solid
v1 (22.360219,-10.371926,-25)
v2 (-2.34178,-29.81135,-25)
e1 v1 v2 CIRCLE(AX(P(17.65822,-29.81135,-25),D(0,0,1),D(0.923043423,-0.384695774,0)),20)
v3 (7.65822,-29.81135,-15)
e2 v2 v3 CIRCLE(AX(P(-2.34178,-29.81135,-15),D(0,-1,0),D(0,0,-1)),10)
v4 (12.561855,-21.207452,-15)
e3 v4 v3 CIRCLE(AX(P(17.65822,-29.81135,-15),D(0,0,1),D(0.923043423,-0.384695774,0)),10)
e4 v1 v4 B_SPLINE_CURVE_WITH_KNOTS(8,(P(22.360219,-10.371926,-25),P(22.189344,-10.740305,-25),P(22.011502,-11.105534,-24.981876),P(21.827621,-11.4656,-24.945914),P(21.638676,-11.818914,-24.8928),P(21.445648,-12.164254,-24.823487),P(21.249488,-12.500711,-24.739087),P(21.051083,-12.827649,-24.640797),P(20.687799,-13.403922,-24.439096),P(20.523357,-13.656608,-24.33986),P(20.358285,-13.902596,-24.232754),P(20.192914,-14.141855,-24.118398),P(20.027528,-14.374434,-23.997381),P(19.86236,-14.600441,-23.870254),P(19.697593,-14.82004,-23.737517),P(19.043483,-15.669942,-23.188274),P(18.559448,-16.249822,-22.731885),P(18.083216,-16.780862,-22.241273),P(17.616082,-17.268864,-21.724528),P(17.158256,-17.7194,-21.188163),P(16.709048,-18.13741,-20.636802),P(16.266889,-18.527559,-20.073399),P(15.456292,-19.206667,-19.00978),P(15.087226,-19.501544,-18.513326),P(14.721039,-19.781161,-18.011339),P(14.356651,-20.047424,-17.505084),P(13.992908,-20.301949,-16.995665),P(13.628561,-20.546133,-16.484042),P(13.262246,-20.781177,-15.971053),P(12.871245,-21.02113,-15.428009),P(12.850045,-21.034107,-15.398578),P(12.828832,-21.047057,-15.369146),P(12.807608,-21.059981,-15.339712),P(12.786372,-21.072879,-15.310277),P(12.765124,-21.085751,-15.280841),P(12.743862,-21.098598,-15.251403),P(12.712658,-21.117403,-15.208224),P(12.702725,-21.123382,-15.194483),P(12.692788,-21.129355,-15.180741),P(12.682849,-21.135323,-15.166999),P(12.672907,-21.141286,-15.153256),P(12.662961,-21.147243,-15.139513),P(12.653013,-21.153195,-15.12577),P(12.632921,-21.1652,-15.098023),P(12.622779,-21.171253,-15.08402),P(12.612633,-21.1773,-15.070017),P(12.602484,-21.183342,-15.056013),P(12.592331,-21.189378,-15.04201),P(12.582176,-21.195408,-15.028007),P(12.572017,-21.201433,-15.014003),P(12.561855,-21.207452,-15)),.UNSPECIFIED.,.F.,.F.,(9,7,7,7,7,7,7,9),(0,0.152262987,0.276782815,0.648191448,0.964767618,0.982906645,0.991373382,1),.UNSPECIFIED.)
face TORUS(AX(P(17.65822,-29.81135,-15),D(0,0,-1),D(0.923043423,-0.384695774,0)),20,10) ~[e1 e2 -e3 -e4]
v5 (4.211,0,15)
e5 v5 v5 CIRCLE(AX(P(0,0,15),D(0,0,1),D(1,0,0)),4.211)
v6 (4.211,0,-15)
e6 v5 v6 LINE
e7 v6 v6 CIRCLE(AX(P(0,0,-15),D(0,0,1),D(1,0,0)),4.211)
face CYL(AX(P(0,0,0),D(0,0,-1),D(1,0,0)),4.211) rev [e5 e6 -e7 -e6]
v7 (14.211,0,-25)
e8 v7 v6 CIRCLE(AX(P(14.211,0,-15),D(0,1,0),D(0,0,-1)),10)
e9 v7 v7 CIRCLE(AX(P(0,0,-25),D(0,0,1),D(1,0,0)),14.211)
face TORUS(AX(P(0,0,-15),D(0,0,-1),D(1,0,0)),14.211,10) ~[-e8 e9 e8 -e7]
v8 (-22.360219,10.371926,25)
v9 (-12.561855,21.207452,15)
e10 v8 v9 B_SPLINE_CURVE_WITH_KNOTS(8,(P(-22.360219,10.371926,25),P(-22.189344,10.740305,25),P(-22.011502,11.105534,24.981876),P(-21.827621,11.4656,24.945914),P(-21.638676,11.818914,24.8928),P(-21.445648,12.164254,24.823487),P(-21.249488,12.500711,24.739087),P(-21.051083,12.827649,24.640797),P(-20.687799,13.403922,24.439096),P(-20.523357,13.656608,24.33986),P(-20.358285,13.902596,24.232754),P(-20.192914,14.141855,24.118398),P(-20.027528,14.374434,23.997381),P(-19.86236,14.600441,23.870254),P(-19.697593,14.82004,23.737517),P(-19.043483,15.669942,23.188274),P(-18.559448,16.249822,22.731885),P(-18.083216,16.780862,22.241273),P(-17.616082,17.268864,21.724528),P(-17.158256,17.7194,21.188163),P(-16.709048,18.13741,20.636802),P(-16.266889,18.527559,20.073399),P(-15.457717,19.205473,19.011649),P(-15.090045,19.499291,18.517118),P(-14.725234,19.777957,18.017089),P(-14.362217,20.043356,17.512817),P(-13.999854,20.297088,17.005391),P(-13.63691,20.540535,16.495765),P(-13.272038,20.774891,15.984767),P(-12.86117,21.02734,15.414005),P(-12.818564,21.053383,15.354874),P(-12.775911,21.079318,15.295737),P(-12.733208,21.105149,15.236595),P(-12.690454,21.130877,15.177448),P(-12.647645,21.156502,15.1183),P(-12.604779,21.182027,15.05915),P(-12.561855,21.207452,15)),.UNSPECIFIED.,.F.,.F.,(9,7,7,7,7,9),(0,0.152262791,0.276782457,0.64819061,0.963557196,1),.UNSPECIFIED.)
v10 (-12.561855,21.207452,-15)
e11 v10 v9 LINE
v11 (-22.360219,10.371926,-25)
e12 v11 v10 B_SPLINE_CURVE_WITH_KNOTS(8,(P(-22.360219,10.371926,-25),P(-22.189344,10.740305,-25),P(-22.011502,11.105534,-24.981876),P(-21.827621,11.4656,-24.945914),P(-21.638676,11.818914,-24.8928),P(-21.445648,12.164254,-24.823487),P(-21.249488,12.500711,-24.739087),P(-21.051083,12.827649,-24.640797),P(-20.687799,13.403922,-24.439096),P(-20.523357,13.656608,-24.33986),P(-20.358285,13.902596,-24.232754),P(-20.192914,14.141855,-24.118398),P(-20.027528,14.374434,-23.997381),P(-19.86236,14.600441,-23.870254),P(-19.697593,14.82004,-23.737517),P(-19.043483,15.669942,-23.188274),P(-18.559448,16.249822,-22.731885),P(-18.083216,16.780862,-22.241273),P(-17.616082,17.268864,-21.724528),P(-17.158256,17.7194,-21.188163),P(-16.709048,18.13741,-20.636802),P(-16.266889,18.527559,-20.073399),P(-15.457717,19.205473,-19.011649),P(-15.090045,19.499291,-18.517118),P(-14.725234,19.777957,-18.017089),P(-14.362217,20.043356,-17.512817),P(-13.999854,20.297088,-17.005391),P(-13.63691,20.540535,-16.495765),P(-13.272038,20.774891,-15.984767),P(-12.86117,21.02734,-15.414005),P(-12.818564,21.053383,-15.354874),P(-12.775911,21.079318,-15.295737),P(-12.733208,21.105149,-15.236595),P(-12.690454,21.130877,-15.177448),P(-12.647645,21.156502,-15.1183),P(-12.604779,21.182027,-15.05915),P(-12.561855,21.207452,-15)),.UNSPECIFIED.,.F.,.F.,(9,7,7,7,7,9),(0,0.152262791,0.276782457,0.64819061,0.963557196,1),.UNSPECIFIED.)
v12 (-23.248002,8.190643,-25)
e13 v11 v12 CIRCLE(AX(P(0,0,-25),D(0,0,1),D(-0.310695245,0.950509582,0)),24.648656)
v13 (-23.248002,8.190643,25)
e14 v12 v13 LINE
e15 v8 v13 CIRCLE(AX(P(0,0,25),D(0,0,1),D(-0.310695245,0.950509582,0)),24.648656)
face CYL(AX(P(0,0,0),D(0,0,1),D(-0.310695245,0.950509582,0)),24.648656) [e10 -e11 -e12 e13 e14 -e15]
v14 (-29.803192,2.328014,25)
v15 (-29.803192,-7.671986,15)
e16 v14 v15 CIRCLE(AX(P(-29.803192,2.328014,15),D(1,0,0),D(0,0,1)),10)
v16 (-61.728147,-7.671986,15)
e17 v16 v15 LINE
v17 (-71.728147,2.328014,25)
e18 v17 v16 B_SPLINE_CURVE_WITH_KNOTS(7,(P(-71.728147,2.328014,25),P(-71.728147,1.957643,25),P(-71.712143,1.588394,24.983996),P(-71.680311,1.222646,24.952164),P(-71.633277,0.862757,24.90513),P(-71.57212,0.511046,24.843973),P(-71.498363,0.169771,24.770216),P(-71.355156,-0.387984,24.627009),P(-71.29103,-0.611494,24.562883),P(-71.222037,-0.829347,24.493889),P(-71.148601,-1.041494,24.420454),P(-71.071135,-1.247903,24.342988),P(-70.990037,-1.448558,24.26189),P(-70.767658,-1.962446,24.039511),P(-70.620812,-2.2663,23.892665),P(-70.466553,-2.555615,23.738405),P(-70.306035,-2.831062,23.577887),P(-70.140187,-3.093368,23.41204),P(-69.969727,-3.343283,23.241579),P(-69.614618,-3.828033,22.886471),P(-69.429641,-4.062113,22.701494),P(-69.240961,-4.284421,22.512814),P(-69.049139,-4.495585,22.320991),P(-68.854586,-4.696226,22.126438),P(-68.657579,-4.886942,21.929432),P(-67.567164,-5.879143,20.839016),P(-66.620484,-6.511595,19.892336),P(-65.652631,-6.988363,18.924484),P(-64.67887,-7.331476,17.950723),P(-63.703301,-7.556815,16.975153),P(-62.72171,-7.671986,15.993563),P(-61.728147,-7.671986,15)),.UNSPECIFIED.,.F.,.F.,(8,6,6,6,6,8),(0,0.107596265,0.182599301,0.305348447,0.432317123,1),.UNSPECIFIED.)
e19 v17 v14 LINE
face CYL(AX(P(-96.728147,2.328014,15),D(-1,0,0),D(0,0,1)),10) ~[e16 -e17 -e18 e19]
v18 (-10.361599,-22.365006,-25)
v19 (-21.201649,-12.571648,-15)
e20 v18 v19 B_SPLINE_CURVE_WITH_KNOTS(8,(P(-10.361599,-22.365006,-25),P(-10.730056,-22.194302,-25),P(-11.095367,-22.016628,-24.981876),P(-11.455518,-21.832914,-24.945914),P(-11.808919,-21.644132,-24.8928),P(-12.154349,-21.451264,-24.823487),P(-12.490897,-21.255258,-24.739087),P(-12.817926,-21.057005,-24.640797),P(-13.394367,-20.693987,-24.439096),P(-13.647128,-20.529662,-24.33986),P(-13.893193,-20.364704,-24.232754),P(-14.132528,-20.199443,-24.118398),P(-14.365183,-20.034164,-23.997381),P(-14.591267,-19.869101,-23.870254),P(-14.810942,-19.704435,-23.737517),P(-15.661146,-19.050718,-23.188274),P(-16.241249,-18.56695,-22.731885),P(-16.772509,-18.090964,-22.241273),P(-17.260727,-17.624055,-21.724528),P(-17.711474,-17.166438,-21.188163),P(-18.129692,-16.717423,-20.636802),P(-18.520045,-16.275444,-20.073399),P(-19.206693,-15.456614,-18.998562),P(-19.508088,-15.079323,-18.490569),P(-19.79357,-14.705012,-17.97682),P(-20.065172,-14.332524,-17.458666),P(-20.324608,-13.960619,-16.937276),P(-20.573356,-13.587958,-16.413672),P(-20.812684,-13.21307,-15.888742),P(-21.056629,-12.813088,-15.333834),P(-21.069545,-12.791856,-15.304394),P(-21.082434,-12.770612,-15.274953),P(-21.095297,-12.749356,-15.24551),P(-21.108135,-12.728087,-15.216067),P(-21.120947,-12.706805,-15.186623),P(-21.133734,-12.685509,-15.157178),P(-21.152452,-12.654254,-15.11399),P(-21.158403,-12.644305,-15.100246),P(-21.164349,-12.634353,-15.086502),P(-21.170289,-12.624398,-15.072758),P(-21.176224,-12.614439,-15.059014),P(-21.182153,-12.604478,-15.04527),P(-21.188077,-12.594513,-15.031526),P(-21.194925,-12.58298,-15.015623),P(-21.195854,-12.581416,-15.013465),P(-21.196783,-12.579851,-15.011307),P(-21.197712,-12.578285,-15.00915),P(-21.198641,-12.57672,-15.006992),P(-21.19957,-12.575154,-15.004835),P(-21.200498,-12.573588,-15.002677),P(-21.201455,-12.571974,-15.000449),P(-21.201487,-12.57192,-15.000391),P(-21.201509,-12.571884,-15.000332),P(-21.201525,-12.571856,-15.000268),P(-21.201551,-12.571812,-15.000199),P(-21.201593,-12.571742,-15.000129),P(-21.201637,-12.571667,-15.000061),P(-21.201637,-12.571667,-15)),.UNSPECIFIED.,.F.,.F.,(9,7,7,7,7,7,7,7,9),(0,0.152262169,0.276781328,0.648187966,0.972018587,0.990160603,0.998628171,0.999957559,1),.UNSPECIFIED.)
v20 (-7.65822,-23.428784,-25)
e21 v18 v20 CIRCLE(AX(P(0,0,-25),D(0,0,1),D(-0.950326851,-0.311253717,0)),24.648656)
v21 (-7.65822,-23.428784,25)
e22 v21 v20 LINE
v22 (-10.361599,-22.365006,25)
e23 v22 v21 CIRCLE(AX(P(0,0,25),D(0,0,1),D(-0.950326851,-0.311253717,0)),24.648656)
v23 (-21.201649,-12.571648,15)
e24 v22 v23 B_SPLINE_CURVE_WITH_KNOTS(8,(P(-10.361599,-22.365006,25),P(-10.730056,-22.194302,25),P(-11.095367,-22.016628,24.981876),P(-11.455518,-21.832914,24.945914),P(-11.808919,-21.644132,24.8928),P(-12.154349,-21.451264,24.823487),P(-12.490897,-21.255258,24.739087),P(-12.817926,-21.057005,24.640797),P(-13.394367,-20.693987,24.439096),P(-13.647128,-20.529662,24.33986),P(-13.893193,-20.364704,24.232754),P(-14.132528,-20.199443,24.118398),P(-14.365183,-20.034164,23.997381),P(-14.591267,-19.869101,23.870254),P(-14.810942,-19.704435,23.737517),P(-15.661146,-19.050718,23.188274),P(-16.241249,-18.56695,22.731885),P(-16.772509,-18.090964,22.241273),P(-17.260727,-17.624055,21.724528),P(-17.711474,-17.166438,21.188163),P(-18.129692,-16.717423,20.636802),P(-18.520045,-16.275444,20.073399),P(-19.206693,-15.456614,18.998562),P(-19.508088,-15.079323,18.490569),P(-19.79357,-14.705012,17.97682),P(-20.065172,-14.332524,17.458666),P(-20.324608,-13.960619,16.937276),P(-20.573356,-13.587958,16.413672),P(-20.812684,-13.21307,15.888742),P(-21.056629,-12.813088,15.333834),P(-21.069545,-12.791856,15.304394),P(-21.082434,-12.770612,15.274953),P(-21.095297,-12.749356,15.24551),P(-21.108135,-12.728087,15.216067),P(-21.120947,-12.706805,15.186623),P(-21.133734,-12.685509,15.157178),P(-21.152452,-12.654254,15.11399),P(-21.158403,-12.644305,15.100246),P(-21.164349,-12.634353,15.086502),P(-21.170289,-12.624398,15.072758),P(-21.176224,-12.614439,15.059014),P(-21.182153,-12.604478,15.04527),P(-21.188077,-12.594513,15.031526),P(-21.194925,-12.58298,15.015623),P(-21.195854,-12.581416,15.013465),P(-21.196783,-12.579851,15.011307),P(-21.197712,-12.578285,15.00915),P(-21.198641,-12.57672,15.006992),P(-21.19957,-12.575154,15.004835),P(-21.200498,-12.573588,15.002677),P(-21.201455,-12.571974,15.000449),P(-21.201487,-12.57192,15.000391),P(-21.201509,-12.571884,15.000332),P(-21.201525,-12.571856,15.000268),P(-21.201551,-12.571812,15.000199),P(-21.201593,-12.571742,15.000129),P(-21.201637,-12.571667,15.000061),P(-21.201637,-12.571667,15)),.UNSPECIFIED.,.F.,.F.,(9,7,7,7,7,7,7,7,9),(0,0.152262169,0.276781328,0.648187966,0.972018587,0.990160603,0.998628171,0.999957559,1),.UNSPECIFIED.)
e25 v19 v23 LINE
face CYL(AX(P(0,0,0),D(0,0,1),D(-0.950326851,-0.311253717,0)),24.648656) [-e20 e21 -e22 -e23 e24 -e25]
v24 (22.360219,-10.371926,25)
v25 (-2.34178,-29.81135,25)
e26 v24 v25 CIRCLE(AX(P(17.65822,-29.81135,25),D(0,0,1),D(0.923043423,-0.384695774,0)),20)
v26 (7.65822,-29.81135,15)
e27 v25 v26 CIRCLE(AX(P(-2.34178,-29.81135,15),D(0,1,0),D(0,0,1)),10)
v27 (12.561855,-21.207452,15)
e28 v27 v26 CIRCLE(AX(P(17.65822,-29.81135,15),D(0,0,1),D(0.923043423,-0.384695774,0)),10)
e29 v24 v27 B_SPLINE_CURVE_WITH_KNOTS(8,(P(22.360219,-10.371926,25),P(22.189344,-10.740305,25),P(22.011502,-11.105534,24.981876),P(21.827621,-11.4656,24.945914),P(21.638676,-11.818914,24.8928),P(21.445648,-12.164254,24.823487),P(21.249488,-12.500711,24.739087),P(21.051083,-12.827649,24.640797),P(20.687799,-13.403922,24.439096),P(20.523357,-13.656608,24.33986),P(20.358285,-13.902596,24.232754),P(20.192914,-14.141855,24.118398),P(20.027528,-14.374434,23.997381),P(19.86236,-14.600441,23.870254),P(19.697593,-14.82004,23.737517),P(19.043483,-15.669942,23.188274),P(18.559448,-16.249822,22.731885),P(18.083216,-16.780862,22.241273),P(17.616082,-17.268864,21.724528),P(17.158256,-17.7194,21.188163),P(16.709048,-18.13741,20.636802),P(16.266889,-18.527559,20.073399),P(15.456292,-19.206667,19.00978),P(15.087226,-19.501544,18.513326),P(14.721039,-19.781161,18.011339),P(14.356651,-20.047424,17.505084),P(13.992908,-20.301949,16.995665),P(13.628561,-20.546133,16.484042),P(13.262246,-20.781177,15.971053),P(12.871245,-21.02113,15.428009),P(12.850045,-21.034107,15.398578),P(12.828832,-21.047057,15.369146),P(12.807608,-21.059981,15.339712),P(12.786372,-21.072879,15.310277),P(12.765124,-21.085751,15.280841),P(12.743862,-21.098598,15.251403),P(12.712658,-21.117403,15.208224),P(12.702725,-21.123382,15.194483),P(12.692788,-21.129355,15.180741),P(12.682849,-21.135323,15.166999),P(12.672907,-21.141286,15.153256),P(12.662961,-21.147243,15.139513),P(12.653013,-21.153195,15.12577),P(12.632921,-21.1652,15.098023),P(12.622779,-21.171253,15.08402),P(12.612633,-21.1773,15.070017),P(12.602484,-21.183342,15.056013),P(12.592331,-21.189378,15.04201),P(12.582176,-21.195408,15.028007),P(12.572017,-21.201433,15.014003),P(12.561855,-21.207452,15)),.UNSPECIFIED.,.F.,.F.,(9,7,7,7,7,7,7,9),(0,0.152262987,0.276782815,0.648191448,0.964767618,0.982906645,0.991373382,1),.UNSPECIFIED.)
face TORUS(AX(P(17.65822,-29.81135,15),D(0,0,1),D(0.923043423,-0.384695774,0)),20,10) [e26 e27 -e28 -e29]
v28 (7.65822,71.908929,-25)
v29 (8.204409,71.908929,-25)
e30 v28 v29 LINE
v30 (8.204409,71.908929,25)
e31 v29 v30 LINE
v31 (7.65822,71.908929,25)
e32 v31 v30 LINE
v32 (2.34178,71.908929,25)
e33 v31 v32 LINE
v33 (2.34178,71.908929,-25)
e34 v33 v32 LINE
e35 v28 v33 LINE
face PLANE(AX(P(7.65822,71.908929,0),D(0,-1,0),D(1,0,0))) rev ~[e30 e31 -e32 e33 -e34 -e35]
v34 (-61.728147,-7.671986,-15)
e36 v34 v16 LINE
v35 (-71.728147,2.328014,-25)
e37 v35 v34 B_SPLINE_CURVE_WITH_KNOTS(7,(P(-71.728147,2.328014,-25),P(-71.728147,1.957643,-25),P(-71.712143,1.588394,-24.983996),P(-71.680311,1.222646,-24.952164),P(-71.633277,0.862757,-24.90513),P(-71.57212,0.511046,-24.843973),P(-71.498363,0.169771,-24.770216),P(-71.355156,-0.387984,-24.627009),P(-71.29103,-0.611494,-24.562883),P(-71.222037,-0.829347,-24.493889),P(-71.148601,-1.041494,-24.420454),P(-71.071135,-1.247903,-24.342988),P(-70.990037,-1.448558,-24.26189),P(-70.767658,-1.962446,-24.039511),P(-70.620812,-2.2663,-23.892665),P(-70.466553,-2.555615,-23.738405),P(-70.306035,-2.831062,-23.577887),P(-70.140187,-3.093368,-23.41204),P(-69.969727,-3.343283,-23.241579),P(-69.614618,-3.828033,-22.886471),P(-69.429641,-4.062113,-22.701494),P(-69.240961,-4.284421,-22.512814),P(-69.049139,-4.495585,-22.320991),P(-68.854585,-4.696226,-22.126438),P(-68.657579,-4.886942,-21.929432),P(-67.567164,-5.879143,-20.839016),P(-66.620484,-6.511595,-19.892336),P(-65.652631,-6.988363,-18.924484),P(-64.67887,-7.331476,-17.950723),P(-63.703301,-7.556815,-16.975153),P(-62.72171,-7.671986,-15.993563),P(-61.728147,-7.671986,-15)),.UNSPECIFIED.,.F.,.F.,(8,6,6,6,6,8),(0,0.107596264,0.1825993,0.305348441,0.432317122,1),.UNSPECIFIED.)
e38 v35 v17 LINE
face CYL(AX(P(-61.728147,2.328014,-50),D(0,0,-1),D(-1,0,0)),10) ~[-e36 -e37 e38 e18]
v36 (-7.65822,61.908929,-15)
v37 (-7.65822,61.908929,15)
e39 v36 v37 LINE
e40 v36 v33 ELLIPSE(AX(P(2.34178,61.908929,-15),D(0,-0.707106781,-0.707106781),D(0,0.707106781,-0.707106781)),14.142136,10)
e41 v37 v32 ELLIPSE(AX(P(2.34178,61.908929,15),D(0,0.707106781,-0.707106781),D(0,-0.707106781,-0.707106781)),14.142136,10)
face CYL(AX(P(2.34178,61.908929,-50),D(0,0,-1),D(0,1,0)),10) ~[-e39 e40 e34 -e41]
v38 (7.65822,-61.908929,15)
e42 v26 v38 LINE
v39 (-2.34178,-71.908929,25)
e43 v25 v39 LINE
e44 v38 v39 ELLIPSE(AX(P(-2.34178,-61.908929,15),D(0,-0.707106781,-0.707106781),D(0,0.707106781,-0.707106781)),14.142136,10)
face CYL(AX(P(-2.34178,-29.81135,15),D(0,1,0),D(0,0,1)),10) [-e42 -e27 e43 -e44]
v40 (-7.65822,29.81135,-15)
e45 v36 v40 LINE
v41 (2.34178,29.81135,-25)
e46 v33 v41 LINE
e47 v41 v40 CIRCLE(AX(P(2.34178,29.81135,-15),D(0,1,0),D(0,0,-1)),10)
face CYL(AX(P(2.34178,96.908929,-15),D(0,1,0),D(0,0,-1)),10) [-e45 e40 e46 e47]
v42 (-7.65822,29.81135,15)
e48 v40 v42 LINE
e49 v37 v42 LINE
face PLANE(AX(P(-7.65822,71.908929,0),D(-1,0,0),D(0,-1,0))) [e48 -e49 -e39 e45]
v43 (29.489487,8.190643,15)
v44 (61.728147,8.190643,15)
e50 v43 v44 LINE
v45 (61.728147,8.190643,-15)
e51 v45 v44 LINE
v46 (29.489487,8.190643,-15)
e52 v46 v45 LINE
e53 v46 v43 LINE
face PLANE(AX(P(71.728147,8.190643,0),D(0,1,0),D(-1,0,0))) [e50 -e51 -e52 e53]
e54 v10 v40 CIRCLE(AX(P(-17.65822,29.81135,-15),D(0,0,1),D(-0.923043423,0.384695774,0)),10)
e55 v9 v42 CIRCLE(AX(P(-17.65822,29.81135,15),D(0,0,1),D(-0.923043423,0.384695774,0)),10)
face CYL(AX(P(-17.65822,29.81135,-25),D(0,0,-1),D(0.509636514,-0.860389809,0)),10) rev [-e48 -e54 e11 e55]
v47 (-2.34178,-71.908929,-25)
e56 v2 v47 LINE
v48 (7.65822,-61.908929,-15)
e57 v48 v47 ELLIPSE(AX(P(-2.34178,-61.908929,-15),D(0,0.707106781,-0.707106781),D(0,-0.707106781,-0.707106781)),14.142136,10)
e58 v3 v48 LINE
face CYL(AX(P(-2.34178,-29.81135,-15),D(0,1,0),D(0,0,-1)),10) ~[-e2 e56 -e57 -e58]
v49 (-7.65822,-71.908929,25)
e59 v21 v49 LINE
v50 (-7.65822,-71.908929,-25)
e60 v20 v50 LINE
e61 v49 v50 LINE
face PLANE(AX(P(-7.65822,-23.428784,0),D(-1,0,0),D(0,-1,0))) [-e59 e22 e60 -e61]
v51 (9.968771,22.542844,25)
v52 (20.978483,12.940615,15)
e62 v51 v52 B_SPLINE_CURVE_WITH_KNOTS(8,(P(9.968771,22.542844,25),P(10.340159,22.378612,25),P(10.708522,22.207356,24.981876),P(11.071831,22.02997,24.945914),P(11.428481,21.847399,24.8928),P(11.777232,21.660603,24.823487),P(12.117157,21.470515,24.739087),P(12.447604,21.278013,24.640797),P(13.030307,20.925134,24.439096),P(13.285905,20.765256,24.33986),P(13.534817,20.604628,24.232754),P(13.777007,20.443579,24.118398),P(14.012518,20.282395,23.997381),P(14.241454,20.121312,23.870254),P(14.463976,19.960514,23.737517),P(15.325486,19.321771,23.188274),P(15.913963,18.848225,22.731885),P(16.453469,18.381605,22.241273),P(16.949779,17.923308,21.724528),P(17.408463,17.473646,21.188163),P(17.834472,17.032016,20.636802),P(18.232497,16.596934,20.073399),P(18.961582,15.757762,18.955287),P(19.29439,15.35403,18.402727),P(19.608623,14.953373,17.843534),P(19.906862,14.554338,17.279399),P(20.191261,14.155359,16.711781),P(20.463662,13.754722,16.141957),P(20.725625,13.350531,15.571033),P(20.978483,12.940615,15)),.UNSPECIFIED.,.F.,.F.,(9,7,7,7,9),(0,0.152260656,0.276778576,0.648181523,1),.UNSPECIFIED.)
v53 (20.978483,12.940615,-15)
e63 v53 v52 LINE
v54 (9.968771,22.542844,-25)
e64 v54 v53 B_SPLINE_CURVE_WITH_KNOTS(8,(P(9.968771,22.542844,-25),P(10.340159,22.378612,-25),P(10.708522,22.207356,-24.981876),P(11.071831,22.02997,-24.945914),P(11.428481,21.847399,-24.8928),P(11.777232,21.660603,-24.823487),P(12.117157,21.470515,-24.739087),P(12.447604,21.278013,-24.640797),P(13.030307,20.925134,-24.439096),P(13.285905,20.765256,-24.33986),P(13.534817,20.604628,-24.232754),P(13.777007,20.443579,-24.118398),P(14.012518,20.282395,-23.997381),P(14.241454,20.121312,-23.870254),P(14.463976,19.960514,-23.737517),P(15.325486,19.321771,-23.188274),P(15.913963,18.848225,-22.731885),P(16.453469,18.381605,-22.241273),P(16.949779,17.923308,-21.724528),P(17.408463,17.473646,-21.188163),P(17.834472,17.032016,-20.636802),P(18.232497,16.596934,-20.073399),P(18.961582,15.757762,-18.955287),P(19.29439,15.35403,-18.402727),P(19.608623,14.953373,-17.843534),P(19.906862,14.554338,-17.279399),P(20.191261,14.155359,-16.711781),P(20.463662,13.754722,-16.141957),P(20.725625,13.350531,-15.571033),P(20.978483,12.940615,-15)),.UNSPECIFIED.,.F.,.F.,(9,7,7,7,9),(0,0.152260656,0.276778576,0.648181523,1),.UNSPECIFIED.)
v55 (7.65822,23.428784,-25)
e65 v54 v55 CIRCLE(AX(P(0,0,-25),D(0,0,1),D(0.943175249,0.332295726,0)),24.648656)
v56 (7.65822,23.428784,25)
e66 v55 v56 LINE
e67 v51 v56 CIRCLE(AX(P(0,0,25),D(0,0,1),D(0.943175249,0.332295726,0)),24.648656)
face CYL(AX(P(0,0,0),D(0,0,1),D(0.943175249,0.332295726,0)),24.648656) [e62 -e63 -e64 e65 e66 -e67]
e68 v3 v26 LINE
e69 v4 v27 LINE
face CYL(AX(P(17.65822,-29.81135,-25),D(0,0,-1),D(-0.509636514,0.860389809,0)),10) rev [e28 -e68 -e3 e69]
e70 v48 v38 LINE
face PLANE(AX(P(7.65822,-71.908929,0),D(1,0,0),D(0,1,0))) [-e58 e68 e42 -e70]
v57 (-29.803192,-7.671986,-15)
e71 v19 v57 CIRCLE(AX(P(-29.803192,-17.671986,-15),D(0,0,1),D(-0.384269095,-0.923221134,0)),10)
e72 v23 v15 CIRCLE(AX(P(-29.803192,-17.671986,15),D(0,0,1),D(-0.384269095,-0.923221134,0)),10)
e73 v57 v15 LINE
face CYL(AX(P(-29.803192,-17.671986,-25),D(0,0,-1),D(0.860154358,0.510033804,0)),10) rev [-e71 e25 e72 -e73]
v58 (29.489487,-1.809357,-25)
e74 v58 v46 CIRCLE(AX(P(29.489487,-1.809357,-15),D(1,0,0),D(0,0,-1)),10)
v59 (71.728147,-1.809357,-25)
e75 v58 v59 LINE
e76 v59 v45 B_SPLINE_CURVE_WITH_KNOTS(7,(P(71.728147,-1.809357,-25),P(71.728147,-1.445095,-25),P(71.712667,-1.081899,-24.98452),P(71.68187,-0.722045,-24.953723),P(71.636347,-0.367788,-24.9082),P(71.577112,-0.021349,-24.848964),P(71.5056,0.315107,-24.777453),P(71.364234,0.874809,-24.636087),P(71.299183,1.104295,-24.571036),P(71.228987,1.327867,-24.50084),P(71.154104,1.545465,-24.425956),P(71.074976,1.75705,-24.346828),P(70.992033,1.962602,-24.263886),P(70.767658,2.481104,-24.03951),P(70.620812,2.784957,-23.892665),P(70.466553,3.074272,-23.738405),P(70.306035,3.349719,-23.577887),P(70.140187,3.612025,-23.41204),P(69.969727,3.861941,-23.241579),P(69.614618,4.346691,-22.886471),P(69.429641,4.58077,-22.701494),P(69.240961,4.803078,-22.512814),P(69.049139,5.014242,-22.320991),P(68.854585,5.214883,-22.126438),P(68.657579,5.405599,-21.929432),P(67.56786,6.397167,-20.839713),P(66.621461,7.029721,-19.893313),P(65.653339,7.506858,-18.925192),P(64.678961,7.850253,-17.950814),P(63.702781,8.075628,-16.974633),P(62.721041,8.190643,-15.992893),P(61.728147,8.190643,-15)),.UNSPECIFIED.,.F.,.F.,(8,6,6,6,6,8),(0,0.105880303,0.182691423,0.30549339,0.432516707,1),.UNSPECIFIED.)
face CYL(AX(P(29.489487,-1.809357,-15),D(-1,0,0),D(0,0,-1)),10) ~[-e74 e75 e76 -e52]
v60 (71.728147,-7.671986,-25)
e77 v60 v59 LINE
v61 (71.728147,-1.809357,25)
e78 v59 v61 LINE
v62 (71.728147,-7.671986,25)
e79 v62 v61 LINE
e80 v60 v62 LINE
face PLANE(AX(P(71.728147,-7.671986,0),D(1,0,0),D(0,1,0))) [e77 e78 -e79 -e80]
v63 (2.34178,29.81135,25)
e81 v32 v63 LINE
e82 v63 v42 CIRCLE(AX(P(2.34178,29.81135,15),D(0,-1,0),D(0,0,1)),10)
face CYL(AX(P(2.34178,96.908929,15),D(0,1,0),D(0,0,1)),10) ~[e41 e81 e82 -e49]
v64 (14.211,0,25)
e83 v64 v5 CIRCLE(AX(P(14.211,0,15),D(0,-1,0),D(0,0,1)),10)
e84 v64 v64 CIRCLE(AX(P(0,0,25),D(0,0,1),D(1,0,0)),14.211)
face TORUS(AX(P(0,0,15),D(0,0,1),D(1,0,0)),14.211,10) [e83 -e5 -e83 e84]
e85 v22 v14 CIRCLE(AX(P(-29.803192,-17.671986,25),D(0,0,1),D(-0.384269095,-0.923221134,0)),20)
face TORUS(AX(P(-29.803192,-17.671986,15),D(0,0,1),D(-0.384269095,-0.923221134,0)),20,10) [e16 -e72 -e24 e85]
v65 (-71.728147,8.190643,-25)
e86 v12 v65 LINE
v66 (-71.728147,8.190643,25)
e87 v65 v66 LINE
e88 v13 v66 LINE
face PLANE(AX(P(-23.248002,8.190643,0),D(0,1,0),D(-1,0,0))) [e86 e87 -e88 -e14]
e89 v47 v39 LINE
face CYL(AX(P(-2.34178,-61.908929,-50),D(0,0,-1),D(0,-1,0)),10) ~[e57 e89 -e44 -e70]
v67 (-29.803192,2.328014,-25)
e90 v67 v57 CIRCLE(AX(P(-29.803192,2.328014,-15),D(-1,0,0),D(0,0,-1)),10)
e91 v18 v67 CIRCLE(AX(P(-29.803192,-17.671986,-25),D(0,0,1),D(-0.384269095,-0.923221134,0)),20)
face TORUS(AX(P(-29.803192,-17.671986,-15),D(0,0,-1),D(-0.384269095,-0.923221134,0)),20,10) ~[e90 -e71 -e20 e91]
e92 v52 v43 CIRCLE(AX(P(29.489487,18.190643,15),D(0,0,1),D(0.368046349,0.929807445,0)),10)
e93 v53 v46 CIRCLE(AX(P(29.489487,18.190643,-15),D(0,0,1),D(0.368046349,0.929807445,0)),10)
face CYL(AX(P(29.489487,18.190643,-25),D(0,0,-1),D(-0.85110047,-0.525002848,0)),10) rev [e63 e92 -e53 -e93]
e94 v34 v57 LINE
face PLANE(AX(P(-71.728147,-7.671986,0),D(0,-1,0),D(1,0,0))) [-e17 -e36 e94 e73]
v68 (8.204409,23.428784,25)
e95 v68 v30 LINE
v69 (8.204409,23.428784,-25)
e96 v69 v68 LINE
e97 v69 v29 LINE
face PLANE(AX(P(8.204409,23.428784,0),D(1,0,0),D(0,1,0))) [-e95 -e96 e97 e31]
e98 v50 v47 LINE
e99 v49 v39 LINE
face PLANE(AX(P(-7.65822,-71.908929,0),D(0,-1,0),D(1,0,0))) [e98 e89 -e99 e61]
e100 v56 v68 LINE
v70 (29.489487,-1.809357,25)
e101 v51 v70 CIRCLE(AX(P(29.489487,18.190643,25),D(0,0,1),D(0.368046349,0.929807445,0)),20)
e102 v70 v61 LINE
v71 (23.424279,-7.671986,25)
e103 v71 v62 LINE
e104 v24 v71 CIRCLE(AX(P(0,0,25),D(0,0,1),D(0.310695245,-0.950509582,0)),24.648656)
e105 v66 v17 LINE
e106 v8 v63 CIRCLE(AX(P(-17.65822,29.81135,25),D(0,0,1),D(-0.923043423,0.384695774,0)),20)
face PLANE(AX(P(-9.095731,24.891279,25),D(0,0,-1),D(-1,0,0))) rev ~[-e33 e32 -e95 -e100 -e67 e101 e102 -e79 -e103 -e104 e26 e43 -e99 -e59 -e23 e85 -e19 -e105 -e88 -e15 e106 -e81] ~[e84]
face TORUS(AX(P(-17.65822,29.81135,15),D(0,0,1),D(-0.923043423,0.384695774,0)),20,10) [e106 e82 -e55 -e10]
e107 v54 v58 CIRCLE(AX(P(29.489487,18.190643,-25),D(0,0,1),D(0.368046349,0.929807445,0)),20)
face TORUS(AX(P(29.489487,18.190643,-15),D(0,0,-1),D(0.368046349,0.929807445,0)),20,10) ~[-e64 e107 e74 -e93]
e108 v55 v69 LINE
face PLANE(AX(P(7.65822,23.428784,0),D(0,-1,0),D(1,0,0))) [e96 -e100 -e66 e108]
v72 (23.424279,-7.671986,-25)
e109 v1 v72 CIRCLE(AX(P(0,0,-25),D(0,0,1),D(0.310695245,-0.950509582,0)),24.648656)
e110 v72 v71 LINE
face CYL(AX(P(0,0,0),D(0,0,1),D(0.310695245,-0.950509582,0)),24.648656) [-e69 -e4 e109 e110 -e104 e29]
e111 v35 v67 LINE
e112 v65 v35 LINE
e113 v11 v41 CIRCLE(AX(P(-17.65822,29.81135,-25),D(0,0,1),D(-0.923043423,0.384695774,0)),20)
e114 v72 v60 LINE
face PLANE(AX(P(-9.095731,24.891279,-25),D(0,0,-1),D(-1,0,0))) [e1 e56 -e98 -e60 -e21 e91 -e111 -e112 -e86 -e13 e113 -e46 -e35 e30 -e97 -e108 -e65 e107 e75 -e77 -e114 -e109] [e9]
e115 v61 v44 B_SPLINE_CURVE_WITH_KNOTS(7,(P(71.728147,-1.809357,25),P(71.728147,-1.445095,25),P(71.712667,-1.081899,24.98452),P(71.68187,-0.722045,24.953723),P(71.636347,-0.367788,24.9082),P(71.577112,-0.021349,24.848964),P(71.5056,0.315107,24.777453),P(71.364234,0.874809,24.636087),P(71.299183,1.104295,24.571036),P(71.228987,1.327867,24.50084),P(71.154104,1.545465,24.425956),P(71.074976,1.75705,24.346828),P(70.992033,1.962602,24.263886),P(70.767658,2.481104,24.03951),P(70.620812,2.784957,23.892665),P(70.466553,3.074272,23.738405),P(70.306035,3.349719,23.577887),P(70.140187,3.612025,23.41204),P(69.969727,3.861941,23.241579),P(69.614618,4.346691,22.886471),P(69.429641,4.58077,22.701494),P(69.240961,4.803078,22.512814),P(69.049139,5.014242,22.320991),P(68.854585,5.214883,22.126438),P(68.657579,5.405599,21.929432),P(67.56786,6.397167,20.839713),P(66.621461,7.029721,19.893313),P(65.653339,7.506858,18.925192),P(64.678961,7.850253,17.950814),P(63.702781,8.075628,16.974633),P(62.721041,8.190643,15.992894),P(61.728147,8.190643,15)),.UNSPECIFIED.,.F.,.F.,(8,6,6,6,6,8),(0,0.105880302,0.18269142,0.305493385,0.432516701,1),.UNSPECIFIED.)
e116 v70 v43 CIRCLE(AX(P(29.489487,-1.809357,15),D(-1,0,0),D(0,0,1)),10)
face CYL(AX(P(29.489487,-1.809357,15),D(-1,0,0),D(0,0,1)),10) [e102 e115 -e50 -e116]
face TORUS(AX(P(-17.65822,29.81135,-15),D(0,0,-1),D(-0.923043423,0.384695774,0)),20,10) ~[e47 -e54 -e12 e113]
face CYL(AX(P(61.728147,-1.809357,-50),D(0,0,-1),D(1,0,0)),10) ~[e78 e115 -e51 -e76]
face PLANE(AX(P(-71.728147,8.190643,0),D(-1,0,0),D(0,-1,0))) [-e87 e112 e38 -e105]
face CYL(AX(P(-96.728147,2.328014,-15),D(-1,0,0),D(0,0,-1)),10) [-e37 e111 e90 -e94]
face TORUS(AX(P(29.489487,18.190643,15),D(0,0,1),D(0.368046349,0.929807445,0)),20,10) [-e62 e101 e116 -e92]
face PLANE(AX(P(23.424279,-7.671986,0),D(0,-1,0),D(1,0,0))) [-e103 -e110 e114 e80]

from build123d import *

# Parameters (mm, degrees)
F0_R         = 4.211
F0_W         = 0.5461883944
F0_H         = 48.4801451702
F1_DEPTH     = 25
F2_T1_DEPTH  = 50
F2_T3_DEPTH  = 100
F2_T5_DEPTH  = 67.0975783302
F2_T7_DEPTH  = 67.2386600166
F2_T9_DEPTH  = 67.0975783302
F2_T11_DEPTH = 66.9249549756
F2_T18_ANGLE = 202.5983722588
F2_T20_ANGLE = 202.5983722588
F2_T22_ANGLE = 202.6248548609
F2_T24_ANGLE = 202.6248548609
F2_T26_ANGLE = 201.5951809175
F2_T28_ANGLE = 201.5951809175
F2_T30_ANGLE = 202.6248548609
F2_T32_ANGLE = 202.6248548609


# Not quite as in the source:
# - a fillet or chamfer that OpenCascade refuses, or shapes differently, is made with other operations: its cross-section is extruded or revolved along the edge and cut away or added


with BuildPart() as f1:
    # F0 (on Top) → F1 (new body, symmetric)
    with BuildSketch(Plane.XY):
        with BuildLine():
            Line((7.6582201656, -71.9089287116), (7.6582201656, -23.4287835415))
            ThreePointArc((7.6582201656, -23.4287835415), (17.4241101733, -17.4343516945), (23.4242794808, -7.6719857367))
            Line((23.4242794808, -7.6719857367), (71.7281472729, -7.6719857367))
            Line((71.7281472729, -7.6719857367), (71.7281472729, 8.1906429889))
            Line((71.7281472729, 8.1906429889), (23.2480021027, 8.1906429889))
            ThreePointArc((23.2480021027, 8.1906429889), (17.2293028181, 17.6268930541), (7.6582201656, 23.4287835415))
            Line((7.6582201656, 23.4287835415), (7.6582201656, 71.9089287116))
            Line((7.6582201656, 71.9089287116), (-7.6582201656, 71.9089287116))
            Line((-7.6582201656, 71.9089287116), (-7.6582201656, 23.4287835415))
            ThreePointArc((-7.6582201656, 23.4287835415), (-17.2293028181, 17.6268930541), (-23.2480021027, 8.1906429889))
            Line((-23.2480021027, 8.1906429889), (-71.7281472729, 8.1906429889))
            Line((-71.7281472729, 8.1906429889), (-71.7281472729, -7.6719857367))
            Line((-71.7281472729, -7.6719857367), (-23.4242794808, -7.6719857367))
            ThreePointArc((-23.4242794808, -7.6719857367), (-17.4241101733, -17.4343516945), (-7.6582201656, -23.4287835415))
            Line((-7.6582201656, -23.4287835415), (-7.6582201656, -71.9089287116))
            Line((-7.6582201656, -71.9089287116), (7.6582201656, -71.9089287116))
        make_face()
        Circle(F0_R, mode=Mode.SUBTRACT)
        with Locations((7.9313143628, 47.6688561266)):
            Rectangle(F0_W, F0_H)
    extrude(amount=F1_DEPTH, both=True)

    # F2: fillet of radius 10 on 18 edges, made by hand

    # F2_s2 → F2_t1 (join)
    with BuildSketch(Plane.XY.offset(-25)):
        with BuildLine():
            ThreePointArc((-12.5618550278, 21.2074522892), (-8.9701924441, 24.8597673709), (-7.6582201656, 29.8113503815))
            Line((-7.6582201656, 29.8113503815), (-7.6582201656, 23.4287835415))
            ThreePointArc((-7.6582201656, 23.4287835415), (-10.170862222, 22.4523895387), (-12.5618550278, 21.2074522892))
        make_face()
        with BuildLine():
            ThreePointArc((20.9784825584, 12.9406145096), (24.6161046934, 9.458510237), (29.4894872562, 8.1906429889))
            Line((29.4894872562, 8.1906429889), (23.2480021027, 8.1906429889))
            ThreePointArc((23.2480021027, 8.1906429889), (22.2404146484, 10.6263912316), (20.9784825584, 12.9406145096))
        make_face()
        with BuildLine():
            ThreePointArc((12.5618550278, -21.2074522892), (8.9701924441, -24.8597673709), (7.6582201656, -29.8113503815))
            Line((7.6582201656, -29.8113503815), (7.6582201656, -23.4287835415))
            ThreePointArc((7.6582201656, -23.4287835415), (10.170862222, -22.4523895387), (12.5618550278, -21.2074522892))
        make_face()
        with BuildLine():
            ThreePointArc((-21.2016487218, -12.5716476969), (-24.8536155677, -8.9828148787), (-29.8031922973, -7.6719857367))
            Line((-29.8031922973, -7.6719857367), (-23.4242794808, -7.6719857367))
            ThreePointArc((-23.4242794808, -7.6719857367), (-22.4470496684, -10.1826418734), (-21.2016487218, -12.5716476969))
        make_face()
    extrude(amount=F2_T1_DEPTH)

    # F2_s4 → F2_t3 (cut)
    with BuildSketch(Plane.XY.offset(-50)):
        with BuildLine():
            ThreePointArc((2.3417798344, 71.9089287116), (-4.7292879775, 68.9799965235), (-7.6582201656, 61.9089287116))
            Line((-7.6582201656, 61.9089287116), (-7.6582201656, 71.9089287116))
            Line((-7.6582201656, 71.9089287116), (2.3417798344, 71.9089287116))
        make_face()
        with BuildLine():
            ThreePointArc((71.7281472729, -1.8093570111), (68.7992150847, 5.2617108008), (61.7281472729, 8.1906429889))
            Line((61.7281472729, 8.1906429889), (71.7281472729, 8.1906429889))
            Line((71.7281472729, 8.1906429889), (71.7281472729, -1.8093570111))
        make_face()
        with BuildLine():
            ThreePointArc((-2.3417798344, -71.9089287116), (4.7292879775, -68.9799965235), (7.6582201656, -61.9089287116))
            Line((7.6582201656, -61.9089287116), (7.6582201656, -71.9089287116))
            Line((7.6582201656, -71.9089287116), (-2.3417798344, -71.9089287116))
        make_face()
        with BuildLine():
            ThreePointArc((-71.7281472729, 2.3280142633), (-68.7992150847, -4.7430535485), (-61.7281472729, -7.6719857367))
            Line((-61.7281472729, -7.6719857367), (-71.7281472729, -7.6719857367))
            Line((-71.7281472729, -7.6719857367), (-71.7281472729, 2.3280142633))
        make_face()
    extrude(amount=F2_T3_DEPTH, mode=Mode.SUBTRACT)

    # F2_s6 → F2_t5 (cut)
    with BuildSketch(Plane.XZ.offset(-96.9089287116)):
        with BuildLine():
            ThreePointArc((2.3417798344, -25), (-4.7292879775, -22.0710678119), (-7.6582201656, -15))
            Line((-7.6582201656, -15), (-7.6582201656, -25))
            Line((-7.6582201656, -25), (2.3417798344, -25))
        make_face()
        with BuildLine():
            ThreePointArc((2.3417798344, 25), (-4.7292879775, 22.0710678119), (-7.6582201656, 15))
            Line((-7.6582201656, 15), (-7.6582201656, 25))
            Line((-7.6582201656, 25), (2.3417798344, 25))
        make_face()
    extrude(amount=F2_T5_DEPTH, mode=Mode.SUBTRACT)

    # F2_s8 → F2_t7 (cut)
    with BuildSketch(Plane.YZ.offset(29.4894872562)):
        with BuildLine():
            ThreePointArc((-1.8093570111, -25), (5.2617108008, -22.0710678119), (8.1906429889, -15))
            Line((8.1906429889, -15), (8.1906429889, -25))
            Line((8.1906429889, -25), (-1.8093570111, -25))
        make_face()
        with BuildLine():
            ThreePointArc((-1.8093570111, 25), (5.2617108008, 22.0710678119), (8.1906429889, 15))
            Line((8.1906429889, 15), (8.1906429889, 25))
            Line((8.1906429889, 25), (-1.8093570111, 25))
        make_face()
    extrude(amount=F2_T7_DEPTH, mode=Mode.SUBTRACT)

    # F2_s10 → F2_t9 (cut)
    with BuildSketch(Plane.XZ.offset(29.8113503815)):
        with BuildLine():
            ThreePointArc((-2.3417798344, -25), (4.7292879775, -22.0710678119), (7.6582201656, -15))
            Line((7.6582201656, -15), (7.6582201656, -25))
            Line((7.6582201656, -25), (-2.3417798344, -25))
        make_face()
        with BuildLine():
            ThreePointArc((-2.3417798344, 25), (4.7292879775, 22.0710678119), (7.6582201656, 15))
            Line((7.6582201656, 15), (7.6582201656, 25))
            Line((7.6582201656, 25), (-2.3417798344, 25))
        make_face()
    extrude(amount=F2_T9_DEPTH, mode=Mode.SUBTRACT)

    # F2_s12 → F2_t11 (cut)
    with BuildSketch(Plane.YZ.offset(-96.7281472729)):
        with BuildLine():
            ThreePointArc((2.3280142633, -25), (-4.7430535485, -22.0710678119), (-7.6719857367, -15))
            Line((-7.6719857367, -15), (-7.6719857367, -25))
            Line((-7.6719857367, -25), (2.3280142633, -25))
        make_face()
        with BuildLine():
            ThreePointArc((2.3280142633, 25), (-4.7430535485, 22.0710678119), (-7.6719857367, 15))
            Line((-7.6719857367, 15), (-7.6719857367, 25))
            Line((-7.6719857367, 25), (2.3280142633, 25))
        make_face()
    extrude(amount=F2_T11_DEPTH, mode=Mode.SUBTRACT)

    # F2_s13 → F2_t14 (revolve, cut)
    with BuildSketch(Plane.XZ):
        with BuildLine():
            ThreePointArc((14.211, -25), (7.1399321881, -22.0710678119), (4.211, -15))
            Line((4.211, -15), (4.211, -25))
            Line((4.211, -25), (14.211, -25))
        make_face()
    revolve(axis=Axis((0, 0, -25), (0, 0, 1)), mode=Mode.SUBTRACT)

    # F2_s15 → F2_t16 (revolve, cut)
    with BuildSketch(Plane.XZ):
        with BuildLine():
            ThreePointArc((14.211, 25), (7.1399321881, 22.0710678119), (4.211, 15))
            Line((4.211, 15), (4.211, 25))
            Line((4.211, 25), (14.211, 25))
        make_face()
    revolve(axis=Axis((0, 0, 25), (0, 0, 1)), mode=Mode.SUBTRACT)

    # F2_s17 → F2_t18 (revolve, cut)
    with BuildSketch(Plane(origin=(-19.132963154, 7.963646146, 0), x_dir=(0, 0, 1), z_dir=(-0.9232211344, 0.3842690946, 0))):
        with BuildLine():
            ThreePointArc((25, -47.7675964389), (22.0710678119, -40.696528627), (15, -37.7675964389))
            Line((15, -37.7675964389), (25, -37.7675964389))
            Line((25, -37.7675964389), (25, -47.7675964389))
        make_face()
    revolve(axis=Axis((-29.8031922972, -17.6719857367, 25), (0, 0, 1)), revolution_arc=F2_T18_ANGLE, mode=Mode.SUBTRACT)

    # F2_s19 → F2_t20 (revolve, cut)
    with BuildSketch(Plane(origin=(-19.132963154, 7.963646146, 0), x_dir=(0, 0, 1), z_dir=(-0.9232211344, 0.3842690946, 0))):
        with BuildLine():
            ThreePointArc((-25, -47.7675964389), (-22.0710678119, -40.696528627), (-15, -37.7675964389))
            Line((-15, -37.7675964389), (-25, -37.7675964389))
            Line((-25, -37.7675964389), (-25, -47.7675964389))
        make_face()
    revolve(axis=Axis((-29.8031922972, -17.6719857367, -25), (0, 0, 1)), revolution_arc=F2_T20_ANGLE, mode=Mode.SUBTRACT)

    # F2_s21 → F2_t22 (revolve, cut)
    with BuildSketch(Plane(origin=(-7.9724845558, -19.1292702646, 0), x_dir=(0, 0, 1), z_dir=(-0.3846957743, -0.9230434233, 0))):
        with BuildLine():
            ThreePointArc((25, -47.7676045084), (22.0710678119, -40.6965366966), (15, -37.7676045084))
            Line((15, -37.7676045084), (25, -37.7676045084))
            Line((25, -37.7676045084), (25, -47.7676045084))
        make_face()
    revolve(axis=Axis((17.6582201656, -29.8113503815, 25), (0, 0, 1)), revolution_arc=F2_T22_ANGLE, mode=Mode.SUBTRACT)

    # F2_s23 → F2_t24 (revolve, cut)
    with BuildSketch(Plane(origin=(-7.9724845558, -19.1292702646, 0), x_dir=(0, 0, 1), z_dir=(-0.3846957743, -0.9230434233, 0))):
        with BuildLine():
            ThreePointArc((-25, -47.7676045084), (-22.0710678119, -40.6965366966), (-15, -37.7676045084))
            Line((-15, -37.7676045084), (-25, -37.7676045084))
            Line((-25, -37.7676045084), (-25, -47.7676045084))
        make_face()
    revolve(axis=Axis((17.6582201656, -29.8113503815, -25), (0, 0, 1)), revolution_arc=F2_T24_ANGLE, mode=Mode.SUBTRACT)

    # F2_s25 → F2_t26 (revolve, cut)
    with BuildSketch(Plane(origin=(19.2698363003, -7.6275931455, 0), x_dir=(0, 0, 1), z_dir=(0.9298074451, -0.3680463489, 0))):
        with BuildLine():
            ThreePointArc((25, -47.7672933998), (22.0710678119, -40.6962255879), (15, -37.7672933998))
            Line((15, -37.7672933998), (25, -37.7672933998))
            Line((25, -37.7672933998), (25, -47.7672933998))
        make_face()
    revolve(axis=Axis((29.4894872562, 18.1906429889, 25), (0, 0, 1)), revolution_arc=F2_T26_ANGLE, mode=Mode.SUBTRACT)

    # F2_s27 → F2_t28 (revolve, cut)
    with BuildSketch(Plane(origin=(19.2698363003, -7.6275931455, 0), x_dir=(0, 0, 1), z_dir=(0.9298074451, -0.3680463489, 0))):
        with BuildLine():
            ThreePointArc((-25, -47.7672933998), (-22.0710678119, -40.6962255879), (-15, -37.7672933998))
            Line((-15, -37.7672933998), (-25, -37.7672933998))
            Line((-25, -37.7672933998), (-25, -47.7672933998))
        make_face()
    revolve(axis=Axis((29.4894872562, 18.1906429889, -25), (0, 0, 1)), revolution_arc=F2_T28_ANGLE, mode=Mode.SUBTRACT)

    # F2_s29 → F2_t30 (revolve, cut)
    with BuildSketch(Plane(origin=(7.9724845558, 19.1292702646, 0), x_dir=(0, 0, 1), z_dir=(0.3846957743, 0.9230434233, 0))):
        with BuildLine():
            ThreePointArc((25, -47.7676045084), (22.0710678119, -40.6965366966), (15, -37.7676045084))
            Line((15, -37.7676045084), (25, -37.7676045084))
            Line((25, -37.7676045084), (25, -47.7676045084))
        make_face()
    revolve(axis=Axis((-17.6582201656, 29.8113503815, 25), (0, 0, 1)), revolution_arc=F2_T30_ANGLE, mode=Mode.SUBTRACT)

    # F2_s31 → F2_t32 (revolve, cut)
    with BuildSketch(Plane(origin=(7.9724845558, 19.1292702646, 0), x_dir=(0, 0, 1), z_dir=(0.3846957743, 0.9230434233, 0))):
        with BuildLine():
            ThreePointArc((-25, -47.7676045084), (-22.0710678119, -40.6965366966), (-15, -37.7676045084))
            Line((-15, -37.7676045084), (-25, -37.7676045084))
            Line((-25, -37.7676045084), (-25, -47.7676045084))
        make_face()
    revolve(axis=Axis((-17.6582201656, 29.8113503815, -25), (0, 0, 1)), revolution_arc=F2_T32_ANGLE, mode=Mode.SUBTRACT)


solid = f1.part
